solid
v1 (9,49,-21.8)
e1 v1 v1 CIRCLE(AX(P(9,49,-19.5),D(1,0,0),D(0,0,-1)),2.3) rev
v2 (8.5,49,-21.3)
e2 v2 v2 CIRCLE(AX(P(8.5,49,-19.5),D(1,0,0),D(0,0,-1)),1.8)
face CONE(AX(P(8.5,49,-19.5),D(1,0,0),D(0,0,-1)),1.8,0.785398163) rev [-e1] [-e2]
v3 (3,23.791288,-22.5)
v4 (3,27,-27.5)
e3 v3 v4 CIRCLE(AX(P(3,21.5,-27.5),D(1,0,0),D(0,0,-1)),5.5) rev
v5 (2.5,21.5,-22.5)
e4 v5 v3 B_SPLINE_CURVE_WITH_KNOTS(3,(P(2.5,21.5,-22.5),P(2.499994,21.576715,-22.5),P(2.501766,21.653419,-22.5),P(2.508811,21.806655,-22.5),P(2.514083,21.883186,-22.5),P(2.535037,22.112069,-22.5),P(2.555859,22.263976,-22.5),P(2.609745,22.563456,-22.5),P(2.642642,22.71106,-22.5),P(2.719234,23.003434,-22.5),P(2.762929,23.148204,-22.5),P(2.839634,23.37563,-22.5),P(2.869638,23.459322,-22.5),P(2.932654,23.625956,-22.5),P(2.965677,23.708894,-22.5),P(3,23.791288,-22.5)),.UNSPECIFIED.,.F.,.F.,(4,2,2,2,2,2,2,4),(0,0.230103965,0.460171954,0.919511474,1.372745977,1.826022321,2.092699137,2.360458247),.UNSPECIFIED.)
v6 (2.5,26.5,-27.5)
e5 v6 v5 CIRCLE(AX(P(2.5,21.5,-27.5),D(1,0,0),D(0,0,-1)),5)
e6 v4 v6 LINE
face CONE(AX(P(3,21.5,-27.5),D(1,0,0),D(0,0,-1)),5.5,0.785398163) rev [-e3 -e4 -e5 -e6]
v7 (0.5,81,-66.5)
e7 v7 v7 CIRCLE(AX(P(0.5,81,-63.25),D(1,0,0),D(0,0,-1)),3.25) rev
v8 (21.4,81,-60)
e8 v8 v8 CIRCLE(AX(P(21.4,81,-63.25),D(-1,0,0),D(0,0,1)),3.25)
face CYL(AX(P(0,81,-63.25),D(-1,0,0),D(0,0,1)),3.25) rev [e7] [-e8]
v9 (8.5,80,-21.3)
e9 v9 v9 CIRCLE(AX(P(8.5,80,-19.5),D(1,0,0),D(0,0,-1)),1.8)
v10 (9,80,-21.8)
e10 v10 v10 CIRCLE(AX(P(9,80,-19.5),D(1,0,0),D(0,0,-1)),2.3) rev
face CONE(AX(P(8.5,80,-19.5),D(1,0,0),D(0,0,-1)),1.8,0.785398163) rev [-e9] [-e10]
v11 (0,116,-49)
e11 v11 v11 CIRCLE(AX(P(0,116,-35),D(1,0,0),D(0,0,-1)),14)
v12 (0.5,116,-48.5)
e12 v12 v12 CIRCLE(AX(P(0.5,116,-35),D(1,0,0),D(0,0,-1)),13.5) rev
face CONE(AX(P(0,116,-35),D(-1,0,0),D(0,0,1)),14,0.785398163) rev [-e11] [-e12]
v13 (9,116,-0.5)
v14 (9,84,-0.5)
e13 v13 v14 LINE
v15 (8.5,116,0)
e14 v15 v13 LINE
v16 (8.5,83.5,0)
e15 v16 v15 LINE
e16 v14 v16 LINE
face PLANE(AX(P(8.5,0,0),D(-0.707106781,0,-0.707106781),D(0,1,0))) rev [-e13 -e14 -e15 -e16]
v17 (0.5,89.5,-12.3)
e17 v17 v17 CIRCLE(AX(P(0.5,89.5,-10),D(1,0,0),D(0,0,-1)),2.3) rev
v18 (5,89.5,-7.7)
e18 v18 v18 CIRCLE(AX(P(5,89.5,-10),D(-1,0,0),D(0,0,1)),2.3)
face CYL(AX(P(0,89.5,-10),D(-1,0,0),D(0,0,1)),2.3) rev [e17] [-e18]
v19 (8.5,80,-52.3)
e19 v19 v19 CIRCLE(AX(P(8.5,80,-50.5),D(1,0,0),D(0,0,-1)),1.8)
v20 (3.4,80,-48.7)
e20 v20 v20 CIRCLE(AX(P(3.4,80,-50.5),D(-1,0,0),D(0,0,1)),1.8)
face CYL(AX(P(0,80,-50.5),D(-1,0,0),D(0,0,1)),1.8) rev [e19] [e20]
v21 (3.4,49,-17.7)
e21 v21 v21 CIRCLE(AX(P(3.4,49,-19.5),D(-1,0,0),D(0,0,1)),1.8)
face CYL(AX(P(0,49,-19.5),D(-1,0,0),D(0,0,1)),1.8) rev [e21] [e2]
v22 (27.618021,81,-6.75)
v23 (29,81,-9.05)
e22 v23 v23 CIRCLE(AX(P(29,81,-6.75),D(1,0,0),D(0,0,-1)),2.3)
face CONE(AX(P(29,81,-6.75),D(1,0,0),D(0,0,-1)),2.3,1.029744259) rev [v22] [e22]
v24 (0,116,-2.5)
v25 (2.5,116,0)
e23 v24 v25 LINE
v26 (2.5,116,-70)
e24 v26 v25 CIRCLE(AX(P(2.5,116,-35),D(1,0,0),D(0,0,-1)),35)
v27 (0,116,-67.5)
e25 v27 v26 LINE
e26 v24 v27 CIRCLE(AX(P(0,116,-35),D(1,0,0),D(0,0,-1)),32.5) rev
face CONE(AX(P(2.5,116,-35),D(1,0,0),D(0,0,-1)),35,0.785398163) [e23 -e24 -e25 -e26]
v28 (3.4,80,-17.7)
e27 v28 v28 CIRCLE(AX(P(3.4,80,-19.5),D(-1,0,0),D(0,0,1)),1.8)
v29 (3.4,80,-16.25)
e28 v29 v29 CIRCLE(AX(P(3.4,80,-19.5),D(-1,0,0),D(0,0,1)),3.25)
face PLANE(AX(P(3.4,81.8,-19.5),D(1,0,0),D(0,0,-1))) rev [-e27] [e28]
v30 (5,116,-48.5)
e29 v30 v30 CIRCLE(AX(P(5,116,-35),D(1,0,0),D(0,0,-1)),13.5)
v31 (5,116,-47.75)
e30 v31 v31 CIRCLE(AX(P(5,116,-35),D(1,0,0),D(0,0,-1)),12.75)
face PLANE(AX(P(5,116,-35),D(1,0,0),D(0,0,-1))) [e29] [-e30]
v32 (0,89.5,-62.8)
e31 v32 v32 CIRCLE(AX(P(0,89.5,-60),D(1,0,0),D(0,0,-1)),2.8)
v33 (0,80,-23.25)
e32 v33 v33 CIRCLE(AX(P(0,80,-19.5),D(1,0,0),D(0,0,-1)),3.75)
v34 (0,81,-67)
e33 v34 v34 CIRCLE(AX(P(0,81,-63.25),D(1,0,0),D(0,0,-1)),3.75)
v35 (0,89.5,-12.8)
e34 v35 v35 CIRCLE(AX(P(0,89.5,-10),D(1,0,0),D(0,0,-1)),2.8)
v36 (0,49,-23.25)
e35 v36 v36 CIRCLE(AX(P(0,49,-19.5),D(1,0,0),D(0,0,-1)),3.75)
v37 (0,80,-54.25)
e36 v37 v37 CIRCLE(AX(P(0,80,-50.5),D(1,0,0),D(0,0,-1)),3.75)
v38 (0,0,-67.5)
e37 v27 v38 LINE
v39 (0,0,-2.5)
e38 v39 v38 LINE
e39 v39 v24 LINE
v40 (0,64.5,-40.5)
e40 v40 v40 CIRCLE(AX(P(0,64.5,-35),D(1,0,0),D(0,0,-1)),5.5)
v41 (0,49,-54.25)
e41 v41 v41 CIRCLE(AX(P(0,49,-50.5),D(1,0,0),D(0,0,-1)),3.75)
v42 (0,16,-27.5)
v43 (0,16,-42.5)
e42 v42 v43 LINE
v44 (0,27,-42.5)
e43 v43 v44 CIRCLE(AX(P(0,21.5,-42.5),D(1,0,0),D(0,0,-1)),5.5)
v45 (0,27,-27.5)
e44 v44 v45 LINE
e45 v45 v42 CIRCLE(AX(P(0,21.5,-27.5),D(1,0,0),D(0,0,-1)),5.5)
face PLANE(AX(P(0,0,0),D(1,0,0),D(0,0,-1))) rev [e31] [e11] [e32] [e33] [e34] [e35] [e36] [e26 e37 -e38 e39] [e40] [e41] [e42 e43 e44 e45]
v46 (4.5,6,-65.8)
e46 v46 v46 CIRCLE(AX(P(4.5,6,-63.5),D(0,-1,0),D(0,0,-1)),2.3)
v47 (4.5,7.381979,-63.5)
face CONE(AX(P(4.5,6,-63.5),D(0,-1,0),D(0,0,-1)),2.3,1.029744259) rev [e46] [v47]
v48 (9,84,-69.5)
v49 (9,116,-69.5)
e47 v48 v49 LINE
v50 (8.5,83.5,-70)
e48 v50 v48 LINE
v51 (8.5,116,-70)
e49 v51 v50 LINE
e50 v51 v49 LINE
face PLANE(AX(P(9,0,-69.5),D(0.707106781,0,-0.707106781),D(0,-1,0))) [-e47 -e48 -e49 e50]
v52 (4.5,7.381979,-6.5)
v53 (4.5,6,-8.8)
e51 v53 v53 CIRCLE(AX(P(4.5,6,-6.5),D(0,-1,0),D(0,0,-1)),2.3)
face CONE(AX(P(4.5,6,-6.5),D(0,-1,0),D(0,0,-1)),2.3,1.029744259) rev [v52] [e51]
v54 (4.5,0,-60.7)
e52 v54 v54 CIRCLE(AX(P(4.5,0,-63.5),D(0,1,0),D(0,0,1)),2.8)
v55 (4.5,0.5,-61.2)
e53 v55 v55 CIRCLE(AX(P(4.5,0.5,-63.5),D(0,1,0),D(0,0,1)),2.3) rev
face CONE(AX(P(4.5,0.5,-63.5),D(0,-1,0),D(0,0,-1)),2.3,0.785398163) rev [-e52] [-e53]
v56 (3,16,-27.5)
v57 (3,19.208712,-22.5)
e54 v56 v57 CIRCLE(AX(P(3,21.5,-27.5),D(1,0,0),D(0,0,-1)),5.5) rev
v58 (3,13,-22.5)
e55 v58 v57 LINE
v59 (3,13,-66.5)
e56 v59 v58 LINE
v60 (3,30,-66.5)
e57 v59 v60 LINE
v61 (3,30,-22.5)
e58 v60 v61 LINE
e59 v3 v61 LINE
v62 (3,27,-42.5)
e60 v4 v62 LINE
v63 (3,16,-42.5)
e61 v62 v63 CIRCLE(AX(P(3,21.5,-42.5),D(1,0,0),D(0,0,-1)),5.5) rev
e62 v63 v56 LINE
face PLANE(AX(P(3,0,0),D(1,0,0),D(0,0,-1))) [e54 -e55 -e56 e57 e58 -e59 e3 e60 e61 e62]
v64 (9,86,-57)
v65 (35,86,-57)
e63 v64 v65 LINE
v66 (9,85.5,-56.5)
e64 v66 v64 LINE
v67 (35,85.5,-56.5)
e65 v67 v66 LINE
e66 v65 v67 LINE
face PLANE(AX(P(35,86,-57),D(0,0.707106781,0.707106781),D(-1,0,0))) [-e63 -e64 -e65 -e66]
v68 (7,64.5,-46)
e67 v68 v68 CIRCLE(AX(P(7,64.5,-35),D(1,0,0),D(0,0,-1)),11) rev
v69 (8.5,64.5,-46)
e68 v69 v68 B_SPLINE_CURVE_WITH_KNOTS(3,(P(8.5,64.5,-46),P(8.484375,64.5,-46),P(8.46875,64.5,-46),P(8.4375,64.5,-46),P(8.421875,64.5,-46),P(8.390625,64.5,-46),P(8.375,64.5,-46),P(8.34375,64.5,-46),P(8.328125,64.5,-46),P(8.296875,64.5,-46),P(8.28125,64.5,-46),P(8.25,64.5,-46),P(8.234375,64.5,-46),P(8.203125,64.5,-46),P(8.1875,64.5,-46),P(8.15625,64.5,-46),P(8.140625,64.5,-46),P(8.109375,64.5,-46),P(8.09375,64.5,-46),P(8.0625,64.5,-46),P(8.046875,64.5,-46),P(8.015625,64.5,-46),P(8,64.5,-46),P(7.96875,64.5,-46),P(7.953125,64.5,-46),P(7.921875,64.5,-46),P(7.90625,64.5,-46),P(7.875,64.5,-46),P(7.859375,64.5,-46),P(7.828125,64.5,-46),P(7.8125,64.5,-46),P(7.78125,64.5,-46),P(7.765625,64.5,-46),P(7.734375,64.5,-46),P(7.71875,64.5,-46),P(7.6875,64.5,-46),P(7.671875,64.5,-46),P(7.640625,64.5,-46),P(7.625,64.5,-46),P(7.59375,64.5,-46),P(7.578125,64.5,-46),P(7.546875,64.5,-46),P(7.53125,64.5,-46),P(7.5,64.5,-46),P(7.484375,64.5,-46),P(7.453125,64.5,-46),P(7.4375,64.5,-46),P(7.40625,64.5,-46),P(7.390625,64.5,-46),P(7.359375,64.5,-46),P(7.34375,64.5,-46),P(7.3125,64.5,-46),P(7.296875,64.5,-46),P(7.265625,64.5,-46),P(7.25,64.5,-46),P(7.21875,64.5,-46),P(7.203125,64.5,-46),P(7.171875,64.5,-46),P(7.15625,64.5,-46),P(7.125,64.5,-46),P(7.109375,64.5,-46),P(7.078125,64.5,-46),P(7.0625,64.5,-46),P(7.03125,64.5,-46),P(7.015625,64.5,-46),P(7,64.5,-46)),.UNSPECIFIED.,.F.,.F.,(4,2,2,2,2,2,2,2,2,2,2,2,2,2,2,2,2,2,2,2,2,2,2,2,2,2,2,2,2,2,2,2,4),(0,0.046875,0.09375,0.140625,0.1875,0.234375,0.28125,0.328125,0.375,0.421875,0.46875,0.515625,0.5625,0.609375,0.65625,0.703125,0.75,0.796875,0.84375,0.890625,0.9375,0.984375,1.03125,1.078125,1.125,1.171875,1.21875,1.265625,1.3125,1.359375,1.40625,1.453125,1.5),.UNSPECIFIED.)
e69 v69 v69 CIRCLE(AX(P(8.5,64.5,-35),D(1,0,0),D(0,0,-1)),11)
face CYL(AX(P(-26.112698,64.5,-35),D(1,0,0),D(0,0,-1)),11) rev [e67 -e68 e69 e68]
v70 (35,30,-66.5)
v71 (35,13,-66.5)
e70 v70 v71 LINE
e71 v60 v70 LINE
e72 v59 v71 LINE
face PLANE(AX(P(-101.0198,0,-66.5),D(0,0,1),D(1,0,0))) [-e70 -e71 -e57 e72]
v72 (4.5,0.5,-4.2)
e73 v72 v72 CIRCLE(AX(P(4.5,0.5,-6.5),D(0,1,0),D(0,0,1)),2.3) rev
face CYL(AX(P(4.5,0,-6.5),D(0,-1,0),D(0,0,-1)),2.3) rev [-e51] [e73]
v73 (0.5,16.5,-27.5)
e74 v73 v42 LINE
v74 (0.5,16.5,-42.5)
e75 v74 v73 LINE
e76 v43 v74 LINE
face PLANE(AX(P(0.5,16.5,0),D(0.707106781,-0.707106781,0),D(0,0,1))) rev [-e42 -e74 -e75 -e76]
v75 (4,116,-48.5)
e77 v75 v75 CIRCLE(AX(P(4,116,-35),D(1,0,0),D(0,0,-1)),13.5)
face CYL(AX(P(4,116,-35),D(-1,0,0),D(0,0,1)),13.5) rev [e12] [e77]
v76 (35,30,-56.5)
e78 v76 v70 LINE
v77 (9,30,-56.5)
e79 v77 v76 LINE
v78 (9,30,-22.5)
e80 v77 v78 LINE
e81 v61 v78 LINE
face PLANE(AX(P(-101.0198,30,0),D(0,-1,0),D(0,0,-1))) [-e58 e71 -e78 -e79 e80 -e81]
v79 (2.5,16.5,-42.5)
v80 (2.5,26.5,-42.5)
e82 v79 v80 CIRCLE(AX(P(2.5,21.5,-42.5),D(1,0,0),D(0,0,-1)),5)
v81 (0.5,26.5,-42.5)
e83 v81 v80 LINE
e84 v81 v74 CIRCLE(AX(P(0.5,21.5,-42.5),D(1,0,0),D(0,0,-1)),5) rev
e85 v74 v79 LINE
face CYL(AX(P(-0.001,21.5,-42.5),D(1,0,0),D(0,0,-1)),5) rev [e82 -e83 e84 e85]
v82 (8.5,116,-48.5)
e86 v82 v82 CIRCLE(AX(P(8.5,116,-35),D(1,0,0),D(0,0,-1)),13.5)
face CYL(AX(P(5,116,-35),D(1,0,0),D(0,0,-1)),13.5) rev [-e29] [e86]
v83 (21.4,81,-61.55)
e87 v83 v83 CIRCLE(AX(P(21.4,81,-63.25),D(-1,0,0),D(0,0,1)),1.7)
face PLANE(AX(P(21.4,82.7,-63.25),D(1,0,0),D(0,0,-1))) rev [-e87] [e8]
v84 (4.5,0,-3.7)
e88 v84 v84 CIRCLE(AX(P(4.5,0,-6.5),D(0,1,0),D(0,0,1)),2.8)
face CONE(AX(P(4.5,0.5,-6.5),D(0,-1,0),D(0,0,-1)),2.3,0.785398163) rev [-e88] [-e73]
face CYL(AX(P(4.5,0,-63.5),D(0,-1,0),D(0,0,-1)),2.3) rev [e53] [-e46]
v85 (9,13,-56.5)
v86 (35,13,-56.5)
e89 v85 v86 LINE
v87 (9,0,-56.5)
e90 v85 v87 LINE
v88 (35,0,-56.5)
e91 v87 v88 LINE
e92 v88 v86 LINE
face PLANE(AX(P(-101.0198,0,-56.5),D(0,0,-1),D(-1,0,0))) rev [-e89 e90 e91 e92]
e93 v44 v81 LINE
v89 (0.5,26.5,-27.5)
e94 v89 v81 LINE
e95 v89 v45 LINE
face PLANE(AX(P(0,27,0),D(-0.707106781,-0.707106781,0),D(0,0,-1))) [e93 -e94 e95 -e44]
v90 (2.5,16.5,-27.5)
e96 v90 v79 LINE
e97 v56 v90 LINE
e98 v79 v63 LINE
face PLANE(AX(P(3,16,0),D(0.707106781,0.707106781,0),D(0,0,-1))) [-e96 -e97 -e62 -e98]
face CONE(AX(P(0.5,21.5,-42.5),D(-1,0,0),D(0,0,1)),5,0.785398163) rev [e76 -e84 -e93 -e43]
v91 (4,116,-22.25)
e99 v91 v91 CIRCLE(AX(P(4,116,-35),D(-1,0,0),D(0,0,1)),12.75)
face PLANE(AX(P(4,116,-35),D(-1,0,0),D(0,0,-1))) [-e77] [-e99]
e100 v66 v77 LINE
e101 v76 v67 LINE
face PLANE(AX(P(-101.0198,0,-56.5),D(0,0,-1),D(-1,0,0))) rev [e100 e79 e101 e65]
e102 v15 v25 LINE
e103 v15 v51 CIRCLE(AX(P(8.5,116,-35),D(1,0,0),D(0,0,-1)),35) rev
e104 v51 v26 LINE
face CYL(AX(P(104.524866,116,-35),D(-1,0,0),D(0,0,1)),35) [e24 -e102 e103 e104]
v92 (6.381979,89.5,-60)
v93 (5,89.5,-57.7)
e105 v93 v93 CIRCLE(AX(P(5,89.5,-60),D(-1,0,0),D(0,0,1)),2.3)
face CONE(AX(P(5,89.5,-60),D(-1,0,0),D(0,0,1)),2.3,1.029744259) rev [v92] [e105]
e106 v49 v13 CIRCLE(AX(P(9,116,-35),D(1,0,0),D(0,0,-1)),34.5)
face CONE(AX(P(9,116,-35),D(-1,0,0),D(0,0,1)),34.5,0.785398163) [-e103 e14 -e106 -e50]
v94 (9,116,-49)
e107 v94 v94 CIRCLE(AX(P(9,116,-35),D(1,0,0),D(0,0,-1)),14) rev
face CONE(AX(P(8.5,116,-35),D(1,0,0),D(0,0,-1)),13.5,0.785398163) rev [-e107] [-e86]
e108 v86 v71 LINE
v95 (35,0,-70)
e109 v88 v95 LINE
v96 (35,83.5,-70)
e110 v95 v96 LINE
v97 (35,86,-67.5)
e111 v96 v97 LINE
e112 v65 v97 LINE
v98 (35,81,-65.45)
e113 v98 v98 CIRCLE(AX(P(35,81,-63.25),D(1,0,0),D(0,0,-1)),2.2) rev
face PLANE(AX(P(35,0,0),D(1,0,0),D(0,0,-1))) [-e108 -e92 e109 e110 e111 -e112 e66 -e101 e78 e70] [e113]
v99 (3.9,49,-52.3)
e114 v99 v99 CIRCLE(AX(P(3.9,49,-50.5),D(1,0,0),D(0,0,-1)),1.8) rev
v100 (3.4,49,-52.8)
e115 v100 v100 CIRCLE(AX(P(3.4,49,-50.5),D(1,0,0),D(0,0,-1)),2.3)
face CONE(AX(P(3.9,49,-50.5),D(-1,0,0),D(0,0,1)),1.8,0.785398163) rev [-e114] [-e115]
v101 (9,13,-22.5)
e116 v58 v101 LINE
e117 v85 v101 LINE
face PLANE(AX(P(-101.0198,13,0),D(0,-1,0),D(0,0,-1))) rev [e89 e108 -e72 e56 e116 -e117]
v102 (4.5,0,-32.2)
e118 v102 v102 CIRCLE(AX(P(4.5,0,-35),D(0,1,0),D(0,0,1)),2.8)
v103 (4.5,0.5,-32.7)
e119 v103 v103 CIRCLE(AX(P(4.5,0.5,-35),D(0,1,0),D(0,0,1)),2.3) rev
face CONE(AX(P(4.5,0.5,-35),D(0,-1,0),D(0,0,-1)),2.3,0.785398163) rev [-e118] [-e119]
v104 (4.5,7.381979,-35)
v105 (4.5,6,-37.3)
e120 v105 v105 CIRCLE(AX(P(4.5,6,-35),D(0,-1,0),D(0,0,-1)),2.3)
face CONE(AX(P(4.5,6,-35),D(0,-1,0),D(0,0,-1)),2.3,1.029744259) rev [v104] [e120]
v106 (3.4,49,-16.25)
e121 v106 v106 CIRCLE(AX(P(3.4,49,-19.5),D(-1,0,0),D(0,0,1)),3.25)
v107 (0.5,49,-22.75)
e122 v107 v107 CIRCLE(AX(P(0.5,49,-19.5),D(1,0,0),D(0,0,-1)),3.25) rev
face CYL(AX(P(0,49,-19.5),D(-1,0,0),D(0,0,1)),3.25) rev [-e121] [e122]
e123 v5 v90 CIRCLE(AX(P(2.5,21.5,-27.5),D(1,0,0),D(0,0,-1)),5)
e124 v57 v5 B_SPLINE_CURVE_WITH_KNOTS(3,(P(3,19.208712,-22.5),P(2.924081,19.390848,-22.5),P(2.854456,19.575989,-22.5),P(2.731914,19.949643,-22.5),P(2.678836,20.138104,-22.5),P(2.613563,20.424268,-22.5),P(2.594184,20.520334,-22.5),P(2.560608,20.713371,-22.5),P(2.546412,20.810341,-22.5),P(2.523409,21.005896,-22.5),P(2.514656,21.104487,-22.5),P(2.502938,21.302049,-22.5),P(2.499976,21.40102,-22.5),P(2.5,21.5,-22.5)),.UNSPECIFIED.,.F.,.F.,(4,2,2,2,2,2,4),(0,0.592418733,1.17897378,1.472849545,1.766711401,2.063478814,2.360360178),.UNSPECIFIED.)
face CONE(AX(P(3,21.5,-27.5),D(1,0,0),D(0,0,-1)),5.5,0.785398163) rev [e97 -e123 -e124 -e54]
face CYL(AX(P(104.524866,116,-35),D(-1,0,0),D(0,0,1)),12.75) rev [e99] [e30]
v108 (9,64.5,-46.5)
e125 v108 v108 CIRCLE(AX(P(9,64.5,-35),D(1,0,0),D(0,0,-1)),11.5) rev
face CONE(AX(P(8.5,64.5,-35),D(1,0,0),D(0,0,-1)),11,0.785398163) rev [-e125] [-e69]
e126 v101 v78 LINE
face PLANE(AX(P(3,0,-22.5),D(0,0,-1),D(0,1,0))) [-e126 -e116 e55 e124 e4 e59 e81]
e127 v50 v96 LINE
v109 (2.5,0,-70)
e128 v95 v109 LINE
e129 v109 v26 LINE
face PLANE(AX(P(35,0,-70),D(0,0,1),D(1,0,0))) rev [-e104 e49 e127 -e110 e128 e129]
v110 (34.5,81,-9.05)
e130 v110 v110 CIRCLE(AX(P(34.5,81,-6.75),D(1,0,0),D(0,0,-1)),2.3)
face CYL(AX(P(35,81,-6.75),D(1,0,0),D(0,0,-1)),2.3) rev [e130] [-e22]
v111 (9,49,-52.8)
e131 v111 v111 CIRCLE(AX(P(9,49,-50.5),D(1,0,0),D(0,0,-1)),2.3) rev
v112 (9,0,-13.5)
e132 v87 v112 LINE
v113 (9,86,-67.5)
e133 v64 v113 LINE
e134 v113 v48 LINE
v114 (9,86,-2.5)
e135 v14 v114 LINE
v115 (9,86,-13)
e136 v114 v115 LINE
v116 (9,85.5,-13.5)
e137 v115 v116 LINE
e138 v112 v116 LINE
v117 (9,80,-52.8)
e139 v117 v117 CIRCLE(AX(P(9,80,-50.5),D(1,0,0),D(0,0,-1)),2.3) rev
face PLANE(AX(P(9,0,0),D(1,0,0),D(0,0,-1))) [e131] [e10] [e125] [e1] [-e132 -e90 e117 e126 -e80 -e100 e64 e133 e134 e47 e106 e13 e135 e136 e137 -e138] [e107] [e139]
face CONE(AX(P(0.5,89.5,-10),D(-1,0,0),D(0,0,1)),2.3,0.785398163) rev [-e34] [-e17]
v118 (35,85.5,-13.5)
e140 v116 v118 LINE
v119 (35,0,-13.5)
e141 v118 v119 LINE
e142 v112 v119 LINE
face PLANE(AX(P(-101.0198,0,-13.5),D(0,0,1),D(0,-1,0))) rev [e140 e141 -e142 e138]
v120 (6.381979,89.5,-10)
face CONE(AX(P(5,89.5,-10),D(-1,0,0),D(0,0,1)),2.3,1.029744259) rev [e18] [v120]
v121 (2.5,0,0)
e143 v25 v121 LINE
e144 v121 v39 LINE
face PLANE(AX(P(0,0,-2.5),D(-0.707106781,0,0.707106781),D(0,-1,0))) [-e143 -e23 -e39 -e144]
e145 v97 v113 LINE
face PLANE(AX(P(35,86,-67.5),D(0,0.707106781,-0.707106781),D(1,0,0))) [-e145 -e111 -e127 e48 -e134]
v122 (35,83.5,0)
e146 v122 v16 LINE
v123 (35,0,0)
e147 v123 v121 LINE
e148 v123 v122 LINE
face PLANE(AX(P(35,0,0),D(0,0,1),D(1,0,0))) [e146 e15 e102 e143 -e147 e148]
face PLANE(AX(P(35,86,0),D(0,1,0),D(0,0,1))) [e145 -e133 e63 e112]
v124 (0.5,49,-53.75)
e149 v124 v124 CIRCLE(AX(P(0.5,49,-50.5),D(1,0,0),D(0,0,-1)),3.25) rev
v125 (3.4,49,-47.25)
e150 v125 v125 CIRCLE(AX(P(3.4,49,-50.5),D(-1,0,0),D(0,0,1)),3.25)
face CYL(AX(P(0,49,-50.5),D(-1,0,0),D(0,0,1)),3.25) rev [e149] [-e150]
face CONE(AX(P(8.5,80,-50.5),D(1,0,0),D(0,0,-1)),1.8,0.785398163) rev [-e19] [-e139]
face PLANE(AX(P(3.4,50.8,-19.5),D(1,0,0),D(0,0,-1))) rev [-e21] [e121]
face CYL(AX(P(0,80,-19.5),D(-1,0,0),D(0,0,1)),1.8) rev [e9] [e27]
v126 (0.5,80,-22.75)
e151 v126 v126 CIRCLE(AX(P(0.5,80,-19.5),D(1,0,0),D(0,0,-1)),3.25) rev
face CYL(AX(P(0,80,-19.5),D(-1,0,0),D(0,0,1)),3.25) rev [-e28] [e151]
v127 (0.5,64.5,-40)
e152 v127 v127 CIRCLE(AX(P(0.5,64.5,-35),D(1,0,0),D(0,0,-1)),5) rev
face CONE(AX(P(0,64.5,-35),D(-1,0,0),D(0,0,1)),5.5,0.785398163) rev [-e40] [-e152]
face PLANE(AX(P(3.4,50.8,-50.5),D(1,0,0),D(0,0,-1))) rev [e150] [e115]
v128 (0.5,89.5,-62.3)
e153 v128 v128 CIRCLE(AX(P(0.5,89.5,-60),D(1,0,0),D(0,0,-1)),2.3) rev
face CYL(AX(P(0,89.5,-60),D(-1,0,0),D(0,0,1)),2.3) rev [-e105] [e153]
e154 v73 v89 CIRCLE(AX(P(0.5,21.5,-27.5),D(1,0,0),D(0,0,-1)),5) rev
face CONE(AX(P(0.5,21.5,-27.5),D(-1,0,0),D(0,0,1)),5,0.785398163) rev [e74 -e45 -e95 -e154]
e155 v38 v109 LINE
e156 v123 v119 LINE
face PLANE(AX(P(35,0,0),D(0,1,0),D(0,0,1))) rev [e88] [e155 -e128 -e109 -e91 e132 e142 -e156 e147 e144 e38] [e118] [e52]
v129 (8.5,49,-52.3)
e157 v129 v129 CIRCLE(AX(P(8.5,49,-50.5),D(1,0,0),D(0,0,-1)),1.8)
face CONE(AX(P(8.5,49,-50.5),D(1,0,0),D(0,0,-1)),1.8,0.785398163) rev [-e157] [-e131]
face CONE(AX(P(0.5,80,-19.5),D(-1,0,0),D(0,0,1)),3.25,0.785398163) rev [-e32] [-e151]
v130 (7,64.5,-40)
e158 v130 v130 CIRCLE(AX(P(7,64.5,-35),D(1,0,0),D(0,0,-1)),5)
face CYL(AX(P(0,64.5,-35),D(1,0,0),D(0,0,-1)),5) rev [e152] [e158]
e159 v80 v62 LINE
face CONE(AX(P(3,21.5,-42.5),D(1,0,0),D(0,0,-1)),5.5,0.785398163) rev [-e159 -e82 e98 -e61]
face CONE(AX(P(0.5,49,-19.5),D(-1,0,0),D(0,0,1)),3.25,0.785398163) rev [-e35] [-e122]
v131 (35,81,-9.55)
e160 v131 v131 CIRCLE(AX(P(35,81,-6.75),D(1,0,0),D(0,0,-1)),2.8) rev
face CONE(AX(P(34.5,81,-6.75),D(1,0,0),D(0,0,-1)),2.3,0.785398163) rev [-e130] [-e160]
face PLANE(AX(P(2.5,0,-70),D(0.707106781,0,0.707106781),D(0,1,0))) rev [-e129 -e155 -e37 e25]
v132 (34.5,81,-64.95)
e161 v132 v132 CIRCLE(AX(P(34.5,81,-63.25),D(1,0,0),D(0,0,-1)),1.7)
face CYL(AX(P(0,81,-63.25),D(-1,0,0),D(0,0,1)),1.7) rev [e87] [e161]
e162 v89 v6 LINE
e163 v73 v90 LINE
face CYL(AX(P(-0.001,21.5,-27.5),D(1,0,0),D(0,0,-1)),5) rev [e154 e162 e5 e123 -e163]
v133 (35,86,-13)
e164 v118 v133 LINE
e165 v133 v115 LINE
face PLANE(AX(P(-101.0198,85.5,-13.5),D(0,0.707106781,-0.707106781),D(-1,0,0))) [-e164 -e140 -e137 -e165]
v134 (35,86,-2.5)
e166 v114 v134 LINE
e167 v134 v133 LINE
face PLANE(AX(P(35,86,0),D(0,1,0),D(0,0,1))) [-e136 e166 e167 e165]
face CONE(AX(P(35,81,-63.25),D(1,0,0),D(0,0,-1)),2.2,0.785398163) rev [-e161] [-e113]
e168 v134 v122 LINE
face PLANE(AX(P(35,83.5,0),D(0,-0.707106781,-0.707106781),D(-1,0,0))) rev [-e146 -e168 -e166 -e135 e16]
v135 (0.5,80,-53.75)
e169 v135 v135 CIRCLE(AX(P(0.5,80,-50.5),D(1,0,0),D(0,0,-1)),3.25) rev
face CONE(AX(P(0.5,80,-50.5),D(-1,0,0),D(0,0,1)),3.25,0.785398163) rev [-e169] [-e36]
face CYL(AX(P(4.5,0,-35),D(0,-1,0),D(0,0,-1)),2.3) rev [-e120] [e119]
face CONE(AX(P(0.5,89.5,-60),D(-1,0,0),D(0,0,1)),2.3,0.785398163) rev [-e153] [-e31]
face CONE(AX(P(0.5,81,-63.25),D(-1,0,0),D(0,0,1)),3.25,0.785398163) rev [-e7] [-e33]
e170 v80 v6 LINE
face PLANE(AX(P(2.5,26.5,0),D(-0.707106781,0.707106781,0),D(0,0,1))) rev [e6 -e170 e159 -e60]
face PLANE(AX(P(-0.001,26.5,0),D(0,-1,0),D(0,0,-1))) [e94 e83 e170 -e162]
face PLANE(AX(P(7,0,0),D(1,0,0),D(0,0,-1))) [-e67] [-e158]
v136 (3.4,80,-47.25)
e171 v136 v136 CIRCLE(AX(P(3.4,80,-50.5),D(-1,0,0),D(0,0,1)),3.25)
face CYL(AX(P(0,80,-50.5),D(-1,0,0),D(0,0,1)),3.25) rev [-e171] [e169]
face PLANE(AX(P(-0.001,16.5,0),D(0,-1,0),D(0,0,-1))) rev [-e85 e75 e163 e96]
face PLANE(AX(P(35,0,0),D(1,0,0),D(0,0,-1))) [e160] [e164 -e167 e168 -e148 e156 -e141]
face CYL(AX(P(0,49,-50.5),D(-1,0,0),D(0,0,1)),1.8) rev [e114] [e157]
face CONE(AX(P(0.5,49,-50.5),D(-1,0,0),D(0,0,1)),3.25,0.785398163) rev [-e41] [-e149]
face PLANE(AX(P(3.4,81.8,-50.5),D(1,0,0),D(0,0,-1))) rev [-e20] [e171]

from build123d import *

# Parameters (mm, degrees)
SKETCH2_W                                           = 70
SKETCH2_H                                           = 86
BOSS_EXTRUDE1_DEPTH                                 = 35
SKETCH9_W                                           = 43
SKETCH9_H                                           = 43
SKETCH9_R                                           = 11
SKETCH9_R_2                                         = 5
SKETCH9_W_2                                         = 10
SKETCH9_H_2                                         = 17
CUT_EXTRUDE1_DEPTH                                  = 26
SKETCH2_5_R                                         = 12.75
BOSS_EXTRUDE2_DEPTH                                 = 9
SKETCH9_3_R                                         = 11
SKETCH9_3_R_2                                       = 5
CUT_EXTRUDE2_DEPTH                                  = 28
SKETCH9_4_R                                         = 5
CUT_EXTRUDE3_DEPTH                                  = 171.076453397
SKETCH20_R                                          = 13.5
CUT_EXTRUDE4_DEPTH                                  = 4
CBORE_FOR_M3_HEX_SOCKET_HEAD_CAP_SCREW1_D           = 3.6
CBORE_FOR_M3_HEX_SOCKET_HEAD_CAP_SCREW1_CBORE_D     = 6.5
CBORE_FOR_M3_HEX_SOCKET_HEAD_CAP_SCREW1_CBORE_DEPTH = 3.4
F_4_6_4_6_DIAMETER_HOLE1_D                          = 4.6
F_4_6_4_6_DIAMETER_HOLE1_DEPTH                      = 6
F_4_6_4_6_DIAMETER_HOLE1_TIP                        = 1.381979424
CBORE_FOR_M3_HEX_SOCKET_HEAD_CAP_SCREW2_D           = 3.4
CBORE_FOR_M3_HEX_SOCKET_HEAD_CAP_SCREW2_CBORE_D     = 6.5
CBORE_FOR_M3_HEX_SOCKET_HEAD_CAP_SCREW2_CBORE_DEPTH = 21.4
F_4_6_4_6_DIAMETER_HOLE2_D                          = 4.6
F_4_6_4_6_DIAMETER_HOLE2_DEPTH                      = 6
F_4_6_4_6_DIAMETER_HOLE2_TIP                        = 1.381979424
F_4_6_4_6_DIAMETER_HOLE3_D                          = 4.6
F_4_6_4_6_DIAMETER_HOLE3_DEPTH                      = 5
F_4_6_4_6_DIAMETER_HOLE3_TIP                        = 1.381979424
CUT_EXTRUDE5_DEPTH                                  = 6
CUT_EXTRUDE6_REACH                                  = 170.455
F_2_5MM_CHAMFER1_SIZE                               = 2.5
F_0_5MM_CHAMFER2_SIZE                               = 0.5


with BuildPart() as part:
    # Sketch2 → Boss-Extrude1 (new body)
    with BuildSketch(Plane(origin=(0, 0, 0), x_dir=(0, 0, -1), z_dir=(1, 0, 0))):
        with Locations((35, 43)):
            Rectangle(SKETCH2_W, SKETCH2_H)
    extrude(amount=BOSS_EXTRUDE1_DEPTH)

    # Sketch9 → Cut-Extrude1 (cut)
    # profile 1 of 5: a face of its own
    with BuildSketch(Plane(origin=(35, 0, 0), x_dir=(0, 0, -1), z_dir=(1, 0, 0))):
        with Locations((35, 64.5)):
            Rectangle(SKETCH9_W, SKETCH9_H)
        with Locations((35, 64.5)):
            Circle(SKETCH9_R, mode=Mode.SUBTRACT)
    # profile 2 of 5: a face of its own
    with BuildSketch(Plane(origin=(35, 0, 0), x_dir=(0, 0, -1), z_dir=(1, 0, 0))):
        with Locations((35, 64.5)):
            Circle(SKETCH9_R)
        with Locations((35, 64.5)):
            Circle(SKETCH9_R_2, mode=Mode.SUBTRACT)
    # profile 3 of 5: a face of its own
    with BuildSketch(Plane(origin=(35, 0, 0), x_dir=(0, 0, -1), z_dir=(1, 0, 0))):
        with Locations((35, 64.5)):
            Circle(SKETCH9_R_2)
    # profile 4 of 5: a face of its own
    with BuildSketch(Plane(origin=(35, 0, 0), x_dir=(0, 0, -1), z_dir=(1, 0, 0))):
        Polygon((56.5, 43), (13.5, 43), (13.5, 0), (56.5, 0), (56.5, 13), (56.5, 30), align=None)
    # profile 5 of 5: a face of its own
    with BuildSketch(Plane(origin=(35, 0, 0), x_dir=(0, 0, -1), z_dir=(1, 0, 0))):
        with Locations((61.5, 21.5)):
            Rectangle(SKETCH9_W_2, SKETCH9_H_2)
    extrude(amount=-CUT_EXTRUDE1_DEPTH, mode=Mode.SUBTRACT)

    # Sketch2<5> → Boss-Extrude2 (add)
    with BuildSketch(Plane(origin=(0, 0, 0), x_dir=(0, 0, -1), z_dir=(1, 0, 0))):
        with BuildLine():
            Line((0, 116), (0, 86))
            Line((0, 86), (70, 86))
            Line((70, 86), (70, 116))
            ThreePointArc((70, 116), (35, 151), (0, 116))
        make_face()
        with Locations((35, 116)):
            Circle(SKETCH2_5_R, mode=Mode.SUBTRACT)
    extrude(amount=BOSS_EXTRUDE2_DEPTH)

    # Sketch9<3> → Cut-Extrude2 (cut)
    # profile 1 of 2: a face of its own
    with BuildSketch(Plane(origin=(35, 0, 0), x_dir=(0, 0, -1), z_dir=(1, 0, 0))):
        with Locations((35, 64.5)):
            Circle(SKETCH9_3_R)
        with Locations((35, 64.5)):
            Circle(SKETCH9_3_R_2, mode=Mode.SUBTRACT)
    # profile 2 of 2: a face of its own
    with BuildSketch(Plane(origin=(35, 0, 0), x_dir=(0, 0, -1), z_dir=(1, 0, 0))):
        with Locations((35, 64.5)):
            Circle(SKETCH9_3_R_2)
    extrude(amount=-CUT_EXTRUDE2_DEPTH, mode=Mode.SUBTRACT)

    # Sketch9<4> → Cut-Extrude3 (cut, through all)
    with BuildSketch(Plane(origin=(35, 0, 0), x_dir=(0, 0, -1), z_dir=(1, 0, 0))):
        with Locations((35, 64.5)):
            Circle(SKETCH9_4_R)
    extrude(amount=-CUT_EXTRUDE3_DEPTH, mode=Mode.SUBTRACT)

    # Sketch20 → Cut-Extrude4 (cut)
    with BuildSketch(Plane(origin=(9, 0, 0), x_dir=(0, 0, -1), z_dir=(1, 0, 0))):
        with Locations((35, 116)):
            Circle(SKETCH20_R)
    cut_extrude4 = extrude(amount=-CUT_EXTRUDE4_DEPTH, mode=Mode.SUBTRACT)

    # Mirror1: Cut-Extrude4 across plane
    add(cut_extrude4.mirror(Plane(origin=(4.5, 0, 0), x_dir=(0, 0, 1), z_dir=(1, 0, 0))), mode=Mode.SUBTRACT)

    # CBORE for M3 Hex Socket Head Cap Screw1 (through all)
    with Locations(Plane.ZY):
        with Locations((-19.5, 49), (-35, 64.5), (-19.5, 80), (-50.5, 49), (-50.5, 80)):
            CounterBoreHole(CBORE_FOR_M3_HEX_SOCKET_HEAD_CAP_SCREW1_D / 2, CBORE_FOR_M3_HEX_SOCKET_HEAD_CAP_SCREW1_CBORE_D / 2, CBORE_FOR_M3_HEX_SOCKET_HEAD_CAP_SCREW1_CBORE_DEPTH)

    # Ø4.6 (4.6) Diameter Hole1
    with Locations(Plane(origin=(0, 0, 0), x_dir=(-1, 0, 0), z_dir=(0, -1, 0))):
        with Locations((-4.5, 35), (-35, 35), (-4.5, 63.5), (-4.5, 6.5)):
            Hole(F_4_6_4_6_DIAMETER_HOLE1_D / 2, depth=F_4_6_4_6_DIAMETER_HOLE1_DEPTH)
            with Locations((0, 0, -(F_4_6_4_6_DIAMETER_HOLE1_DEPTH + F_4_6_4_6_DIAMETER_HOLE1_TIP / 2))):  # 118° drill point
                Cone(0, F_4_6_4_6_DIAMETER_HOLE1_D / 2, F_4_6_4_6_DIAMETER_HOLE1_TIP, mode=Mode.SUBTRACT)

    # CBORE for M3 Hex Socket Head Cap Screw2 (through all)
    with Locations(Plane.ZY):
        with Locations((-63.25, 81)):
            CounterBoreHole(CBORE_FOR_M3_HEX_SOCKET_HEAD_CAP_SCREW2_D / 2, CBORE_FOR_M3_HEX_SOCKET_HEAD_CAP_SCREW2_CBORE_D / 2, CBORE_FOR_M3_HEX_SOCKET_HEAD_CAP_SCREW2_CBORE_DEPTH)

    # Ø4.6 (4.6) Diameter Hole2
    with Locations(Plane(origin=(35, 0, 0), x_dir=(0, 0, -1), z_dir=(1, 0, 0))):
        with Locations((6.75, 81)):
            Hole(F_4_6_4_6_DIAMETER_HOLE2_D / 2, depth=F_4_6_4_6_DIAMETER_HOLE2_DEPTH)
            with Locations((0, 0, -(F_4_6_4_6_DIAMETER_HOLE2_DEPTH + F_4_6_4_6_DIAMETER_HOLE2_TIP / 2))):  # 118° drill point
                Cone(0, F_4_6_4_6_DIAMETER_HOLE2_D / 2, F_4_6_4_6_DIAMETER_HOLE2_TIP, mode=Mode.SUBTRACT)

    # Ø4.6 (4.6) Diameter Hole3
    with Locations(Plane.ZY):
        with Locations((-60, 89.5), (-10, 89.5)):
            Hole(F_4_6_4_6_DIAMETER_HOLE3_D / 2, depth=F_4_6_4_6_DIAMETER_HOLE3_DEPTH)
            with Locations((0, 0, -(F_4_6_4_6_DIAMETER_HOLE3_DEPTH + F_4_6_4_6_DIAMETER_HOLE3_TIP / 2))):  # 118° drill point
                Cone(0, F_4_6_4_6_DIAMETER_HOLE3_D / 2, F_4_6_4_6_DIAMETER_HOLE3_TIP, mode=Mode.SUBTRACT)

    # Sketch23 → Cut-Extrude5 (cut)
    # profile 1 of 2: a face of its own
    with BuildSketch(Plane(origin=(9, 0, 0), x_dir=(0, 0, -1), z_dir=(1, 0, 0))):
        Polygon((56.5, 13), (66.5, 13), (66.5, 30), (56.5, 30), (22.5, 30), (22.5, 21.49999992), (22.5, 13), align=None)
        with BuildLine():
            ThreePointArc((27.5, 16.5), (23.964466122, 17.964466066), (22.5, 21.49999992))
            ThreePointArc((22.5, 21.49999992), (23.964466066, 25.035533878), (27.5, 26.5))
            Line((27.5, 26.5), (42.5, 26.5))
            ThreePointArc((42.5, 26.5), (47.5, 21.5), (42.5, 16.5))
            Line((42.5, 16.5), (27.5, 16.5))
        make_face(mode=Mode.SUBTRACT)
    # profile 2 of 2: a face of its own
    with BuildSketch(Plane(origin=(9, 0, 0), x_dir=(0, 0, -1), z_dir=(1, 0, 0))):
        with BuildLine():
            Line((27.5, 16.5), (42.5, 16.5))
            ThreePointArc((42.5, 16.5), (47.5, 21.5), (42.5, 26.5))
            Line((42.5, 26.5), (27.5, 26.5))
            ThreePointArc((27.5, 26.5), (22.5, 21.5), (27.5, 16.5))
        make_face()
    extrude(amount=-CUT_EXTRUDE5_DEPTH, mode=Mode.SUBTRACT)

    # Sketch23<3> → Cut-Extrude6 (cut, up to next)
    with BuildSketch(Plane(origin=(9, 0, 0), x_dir=(0, 0, -1), z_dir=(1, 0, 0)), mode=Mode.PRIVATE) as cut_extrude6_sk1:
        with BuildLine():
            Line((27.5, 16.5), (42.5, 16.5))
            ThreePointArc((42.5, 16.5), (47.5, 21.5), (42.5, 26.5))
            Line((42.5, 26.5), (27.5, 26.5))
            ThreePointArc((27.5, 26.5), (22.5, 21.5), (27.5, 16.5))
        make_face()
    cut_extrude6_tool1 = extrude(cut_extrude6_sk1.sketch, amount=-CUT_EXTRUDE6_REACH, mode=Mode.PRIVATE) & part.part
    add(cut_extrude6_tool1.solids().sort_by_distance((9, 21.5, -35))[0], mode=Mode.SUBTRACT)

    # 2,5mm Chamfer1
    f_2_5mm_chamfer1_edges = [part.edges().sort_by_distance(p)[0] for p in [
        (0, 151, -35),
        (0, 58, 0),
        (0, 58, -70),
        (22, 86, 0),
        (22, 86, -70),
    ]]
    chamfer(f_2_5mm_chamfer1_edges, length=F_2_5MM_CHAMFER1_SIZE)

    # 0,5mm Chamfer2
    # the kernel refuses this chamfer: 0.5 mm, written as the material it takes off along each edge
    with BuildSketch(Plane(origin=(9, 80, -50.5), x_dir=(0, 0, -1), z_dir=(0, -1, 0))) as f_0_5mm_chamfer2_piece_1:
        Polygon((1.8 + F_0_5MM_CHAMFER2_SIZE, 0), (1.8, -F_0_5MM_CHAMFER2_SIZE), (1.8, 0), align=None)
    revolve(axis=Axis((9, 80, -50.5), (1, 0, 0)), mode=Mode.SUBTRACT)
    with BuildSketch(Plane(origin=(0, 80, -50.5), x_dir=(0, 0, 1), z_dir=(0, -1, 0))) as f_0_5mm_chamfer2_piece_2:
        Polygon((3.25, -F_0_5MM_CHAMFER2_SIZE), (3.25 + F_0_5MM_CHAMFER2_SIZE, 0), (3.25, 0), align=None)
    revolve(axis=Axis((0, 80, -50.5), (-1, 0, 0)), mode=Mode.SUBTRACT)
    with BuildSketch(Plane(origin=(9, 49, -50.5), x_dir=(0, 0, -1), z_dir=(0, -1, 0))) as f_0_5mm_chamfer2_piece_3:
        Polygon((1.8 + F_0_5MM_CHAMFER2_SIZE, 0), (1.8, -F_0_5MM_CHAMFER2_SIZE), (1.8, 0), align=None)
    revolve(axis=Axis((9, 49, -50.5), (1, 0, 0)), mode=Mode.SUBTRACT)
    with BuildSketch(Plane(origin=(0, 49, -50.5), x_dir=(0, 0, 1), z_dir=(0, -1, 0))) as f_0_5mm_chamfer2_piece_4:
        Polygon((3.25, -F_0_5MM_CHAMFER2_SIZE), (3.25 + F_0_5MM_CHAMFER2_SIZE, 0), (3.25, 0), align=None)
    revolve(axis=Axis((0, 49, -50.5), (-1, 0, 0)), mode=Mode.SUBTRACT)
    with BuildSketch(Plane(origin=(3.4, 49, -50.5), x_dir=(0, 0, -1), z_dir=(0, -1, 0))) as f_0_5mm_chamfer2_piece_5:
        Polygon((1.8, F_0_5MM_CHAMFER2_SIZE), (1.8 + F_0_5MM_CHAMFER2_SIZE, 0), (1.8, 0), align=None)
    revolve(axis=Axis((3.4, 49, -50.5), (1, 0, 0)), mode=Mode.SUBTRACT)
    with BuildSketch(Plane(origin=(9, 80, -19.5), x_dir=(0, 0, -1), z_dir=(0, -1, 0))) as f_0_5mm_chamfer2_piece_6:
        Polygon((1.8 + F_0_5MM_CHAMFER2_SIZE, 0), (1.8, -F_0_5MM_CHAMFER2_SIZE), (1.8, 0), align=None)
    revolve(axis=Axis((9, 80, -19.5), (1, 0, 0)), mode=Mode.SUBTRACT)
    with BuildSketch(Plane(origin=(0, 80, -19.5), x_dir=(0, 0, 1), z_dir=(0, -1, 0))) as f_0_5mm_chamfer2_piece_7:
        Polygon((3.25, -F_0_5MM_CHAMFER2_SIZE), (3.25 + F_0_5MM_CHAMFER2_SIZE, 0), (3.25, 0), align=None)
    revolve(axis=Axis((0, 80, -19.5), (-1, 0, 0)), mode=Mode.SUBTRACT)
    with BuildSketch(Plane(origin=(4.5, 0, -35), x_dir=(1, 0, 0), z_dir=(0, 0, 1))) as f_0_5mm_chamfer2_piece_8:
        Polygon((2.3 + F_0_5MM_CHAMFER2_SIZE, 0), (2.3, F_0_5MM_CHAMFER2_SIZE), (2.3, 0), align=None)
    revolve(axis=Axis((4.5, 0, -35), (0, 1, 0)), mode=Mode.SUBTRACT)
    with BuildSketch(Plane(origin=(4.5, 0, -6.5), x_dir=(1, 0, 0), z_dir=(0, 0, 1))) as f_0_5mm_chamfer2_piece_9:
        Polygon((2.3 + F_0_5MM_CHAMFER2_SIZE, 0), (2.3, F_0_5MM_CHAMFER2_SIZE), (2.3, 0), align=None)
    revolve(axis=Axis((4.5, 0, -6.5), (0, 1, 0)), mode=Mode.SUBTRACT)
    with BuildSketch(Plane(origin=(4.5, 0, -63.5), x_dir=(1, 0, 0), z_dir=(0, 0, 1))) as f_0_5mm_chamfer2_piece_10:
        Polygon((2.3 + F_0_5MM_CHAMFER2_SIZE, 0), (2.3, F_0_5MM_CHAMFER2_SIZE), (2.3, 0), align=None)
    revolve(axis=Axis((4.5, 0, -63.5), (0, 1, 0)), mode=Mode.SUBTRACT)
    with BuildSketch(Plane(origin=(0, 81, -63.25), x_dir=(0, 0, 1), z_dir=(0, -1, 0))) as f_0_5mm_chamfer2_piece_11:
        Polygon((3.25, -F_0_5MM_CHAMFER2_SIZE), (3.25 + F_0_5MM_CHAMFER2_SIZE, 0), (3.25, 0), align=None)
    revolve(axis=Axis((0, 81, -63.25), (-1, 0, 0)), mode=Mode.SUBTRACT)
    with BuildSketch(Plane(origin=(35, 81, -63.25), x_dir=(0, 0, -1), z_dir=(0, -1, 0))) as f_0_5mm_chamfer2_piece_12:
        Polygon((1.7 + F_0_5MM_CHAMFER2_SIZE, 0), (1.7, -F_0_5MM_CHAMFER2_SIZE), (1.7, 0), align=None)
    revolve(axis=Axis((35, 81, -63.25), (1, 0, 0)), mode=Mode.SUBTRACT)
    with BuildSketch(Plane(origin=(35, 81, -6.75), x_dir=(0, 0, 1), z_dir=(0, -1, 0))) as f_0_5mm_chamfer2_piece_13:
        Polygon((2.3 + F_0_5MM_CHAMFER2_SIZE, 0), (2.3, F_0_5MM_CHAMFER2_SIZE), (2.3, 0), align=None)
    revolve(axis=Axis((35, 81, -6.75), (-1, 0, 0)), mode=Mode.SUBTRACT)
    with BuildSketch(Plane(origin=(0, 89.5, -60), x_dir=(0, 0, -1), z_dir=(0, -1, 0))) as f_0_5mm_chamfer2_piece_14:
        Polygon((2.3 + F_0_5MM_CHAMFER2_SIZE, 0), (2.3, F_0_5MM_CHAMFER2_SIZE), (2.3, 0), align=None)
    revolve(axis=Axis((0, 89.5, -60), (1, 0, 0)), mode=Mode.SUBTRACT)
    with BuildSketch(Plane(origin=(0, 89.5, -10), x_dir=(0, 0, -1), z_dir=(0, -1, 0))) as f_0_5mm_chamfer2_piece_15:
        Polygon((2.3 + F_0_5MM_CHAMFER2_SIZE, 0), (2.3, F_0_5MM_CHAMFER2_SIZE), (2.3, 0), align=None)
    revolve(axis=Axis((0, 89.5, -10), (1, 0, 0)), mode=Mode.SUBTRACT)
    with BuildSketch(Plane(origin=(3, 16.5, -42.5), x_dir=(0.02749587661058651, -0.9996219169112968, 0), z_dir=(0, 0, 1)), Plane(origin=(0, 26.5, -27.5), x_dir=(0.9996219169112968, -0.02749587661058908, 0), z_dir=(0, 0, -1)), Plane(origin=(3, 26.5, -27.5), x_dir=(0.027495876610586414, 0.9996219169112968, 0), z_dir=(0, 0, -1)), Plane(origin=(0, 16.5, -42.5), x_dir=(0.9996219169112968, 0.02749587661058908, 0), z_dir=(0, 0, 1))) as f_0_5mm_chamfer2_piece_16:
        Polygon((F_0_5MM_CHAMFER2_SIZE * 0.999621916911, -F_0_5MM_CHAMFER2_SIZE * 0.0274958766106), (-F_0_5MM_CHAMFER2_SIZE * 0.0274958766106, -F_0_5MM_CHAMFER2_SIZE * 0.999621916911), (0, 0), align=None)
    extrude(amount=15, mode=Mode.SUBTRACT)
    with BuildSketch(Plane(origin=(3, 21.5, -27.5), x_dir=(0, -1, 0), z_dir=(0, 0, -1))) as f_0_5mm_chamfer2_piece_17_section:
        Polygon((5 + F_0_5MM_CHAMFER2_SIZE, 0), (5, F_0_5MM_CHAMFER2_SIZE), (5, 0), align=None)
    f_0_5mm_chamfer2_piece_17 = revolve(axis=Axis((3, 21.5, -27.5), (-1, 0, 0)), revolution_arc=90, mode=Mode.PRIVATE)
    f_0_5mm_chamfer2_piece_17 = split(f_0_5mm_chamfer2_piece_17, bisect_by=Plane(origin=(2.857900217, 16.356388303, -22.5), z_dir=(0, 0, -1)), keep=Keep.TOP, mode=Mode.PRIVATE)
    add(f_0_5mm_chamfer2_piece_17, mode=Mode.SUBTRACT)
    with BuildSketch(Plane(origin=(3, 21.5, -27.5), x_dir=(0, 0, 1), z_dir=(0, -1, 0))) as f_0_5mm_chamfer2_piece_18_section:
        Polygon((5 + F_0_5MM_CHAMFER2_SIZE, 0), (5, F_0_5MM_CHAMFER2_SIZE), (5, 0), align=None)
    f_0_5mm_chamfer2_piece_18 = revolve(axis=Axis((3, 21.5, -27.5), (-1, 0, 0)), revolution_arc=90, mode=Mode.PRIVATE)
    f_0_5mm_chamfer2_piece_18 = split(f_0_5mm_chamfer2_piece_18, bisect_by=Plane(origin=(2.756305159, 25.207852181, -22.5), z_dir=(0, 0, -1)), keep=Keep.TOP, mode=Mode.PRIVATE)
    add(f_0_5mm_chamfer2_piece_18, mode=Mode.SUBTRACT)
    with BuildSketch(Plane(origin=(3, 21.5, -42.5), x_dir=(0, -1, 0), z_dir=(0, 0, 1))) as f_0_5mm_chamfer2_piece_19:
        Polygon((5 + F_0_5MM_CHAMFER2_SIZE, 0), (5, -F_0_5MM_CHAMFER2_SIZE), (5, 0), align=None)
    revolve(axis=Axis((3, 21.5, -42.5), (1, 0, 0)), revolution_arc=180, mode=Mode.SUBTRACT)
    with BuildSketch(Plane(origin=(0, 21.5, -42.5), x_dir=(0, -1, 0), z_dir=(0, 0, 1))) as f_0_5mm_chamfer2_piece_20:
        Polygon((5, F_0_5MM_CHAMFER2_SIZE), (5 + F_0_5MM_CHAMFER2_SIZE, 0), (5, 0), align=None)
    revolve(axis=Axis((0, 21.5, -42.5), (1, 0, 0)), revolution_arc=180, mode=Mode.SUBTRACT)
    with BuildSketch(Plane(origin=(0, 21.5, -27.5), x_dir=(0, 1, 0), z_dir=(0, 0, -1))) as f_0_5mm_chamfer2_piece_21:
        Polygon((5, F_0_5MM_CHAMFER2_SIZE), (5 + F_0_5MM_CHAMFER2_SIZE, 0), (5, 0), align=None)
    revolve(axis=Axis((0, 21.5, -27.5), (1, 0, 0)), revolution_arc=180, mode=Mode.SUBTRACT)
    with BuildSketch(Plane(origin=(36.285841494, 86, -13.5), x_dir=(0, 0.0274958766105822, 0.999621916911297), z_dir=(-1, 0, 0))) as f_0_5mm_chamfer2_piece_22:
        Polygon((F_0_5MM_CHAMFER2_SIZE * 0.999621916911, -F_0_5MM_CHAMFER2_SIZE * 0.0274958766106), (-F_0_5MM_CHAMFER2_SIZE * 0.0274958766106, -F_0_5MM_CHAMFER2_SIZE * 0.999621916911), (0, 0), align=None)
    extrude(amount=27.285841494, mode=Mode.SUBTRACT)
    with BuildSketch(Plane(origin=(36.285841494, 86, -56.5), x_dir=(0, 0.02749587661058229, -0.9996219169112968), z_dir=(-1, 0, 0))) as f_0_5mm_chamfer2_piece_23:
        Polygon((F_0_5MM_CHAMFER2_SIZE * 0.999621916911, F_0_5MM_CHAMFER2_SIZE * 0.0274958766106), (-F_0_5MM_CHAMFER2_SIZE * 0.0274958766106, F_0_5MM_CHAMFER2_SIZE * 0.999621916911), (0, 0), align=None)
    extrude(amount=27.285841494, mode=Mode.SUBTRACT)
    with BuildSketch(Plane(origin=(9, 82.214158506, 0), x_dir=(0.02749587661058563, 0, -0.9996219169112968), z_dir=(0, 1, 0))) as f_0_5mm_chamfer2_piece_24_section:
        Polygon((F_0_5MM_CHAMFER2_SIZE * 0.999621916911, F_0_5MM_CHAMFER2_SIZE * 0.0274958766106), (-F_0_5MM_CHAMFER2_SIZE * 0.0274958766106, F_0_5MM_CHAMFER2_SIZE * 0.999621916911), (0, 0), align=None)
    f_0_5mm_chamfer2_piece_24 = extrude(amount=33.785841494, mode=Mode.PRIVATE)
    f_0_5mm_chamfer2_piece_24 = split(f_0_5mm_chamfer2_piece_24, bisect_by=Plane(origin=(8.830530304, 90.974038618, -7.474038618), z_dir=(0, 0.7071067811865476, 0.7071067811865476)), keep=Keep.TOP, mode=Mode.PRIVATE)
    add(f_0_5mm_chamfer2_piece_24, mode=Mode.SUBTRACT)
    with BuildSketch(Plane(origin=(9, 116, -70), x_dir=(0.02749587661058574, 0, 0.9996219169112968), z_dir=(0, -1, 0))) as f_0_5mm_chamfer2_piece_25_section:
        Polygon((F_0_5MM_CHAMFER2_SIZE * 0.999621916911, F_0_5MM_CHAMFER2_SIZE * 0.0274958766106), (-F_0_5MM_CHAMFER2_SIZE * 0.0274958766106, F_0_5MM_CHAMFER2_SIZE * 0.999621916911), (0, 0), align=None)
    f_0_5mm_chamfer2_piece_25 = extrude(amount=33.785841494, mode=Mode.PRIVATE)
    f_0_5mm_chamfer2_piece_25 = split(f_0_5mm_chamfer2_piece_25, bisect_by=Plane(origin=(8.857094112, 98.934594611, -54.565405389), z_dir=(0, 0.7071067811865476, -0.7071067811865476)), keep=Keep.TOP, mode=Mode.PRIVATE)
    add(f_0_5mm_chamfer2_piece_25, mode=Mode.SUBTRACT)
    with BuildSketch(Plane(origin=(9, 116, -35), x_dir=(0, 0, -1), z_dir=(0, -1, 0))) as f_0_5mm_chamfer2_piece_26:
        Polygon((35 - F_0_5MM_CHAMFER2_SIZE, 0), (35, -F_0_5MM_CHAMFER2_SIZE), (35, 0), align=None)
    revolve(axis=Axis((9, 116, -35), (1, 0, 0)), revolution_arc=180, mode=Mode.SUBTRACT)
    with BuildSketch(Plane(origin=(9, 64.5, -35), x_dir=(0, 0, -1), z_dir=(0, -1, 0))) as f_0_5mm_chamfer2_piece_27:
        Polygon((11 + F_0_5MM_CHAMFER2_SIZE, 0), (11, -F_0_5MM_CHAMFER2_SIZE), (11, 0), align=None)
    revolve(axis=Axis((9, 64.5, -35), (1, 0, 0)), mode=Mode.SUBTRACT)
    with BuildSketch(Plane(origin=(0, 64.5, -35), x_dir=(0, 0, -1), z_dir=(0, -1, 0))) as f_0_5mm_chamfer2_piece_28:
        Polygon((5, F_0_5MM_CHAMFER2_SIZE), (5 + F_0_5MM_CHAMFER2_SIZE, 0), (5, 0), align=None)
    revolve(axis=Axis((0, 64.5, -35), (1, 0, 0)), mode=Mode.SUBTRACT)
    with BuildSketch(Plane(origin=(9, 116, -35), x_dir=(0, 0, -1), z_dir=(0, -1, 0))) as f_0_5mm_chamfer2_piece_29:
        Polygon((13.5 + F_0_5MM_CHAMFER2_SIZE, 0), (13.5, -F_0_5MM_CHAMFER2_SIZE), (13.5, 0), align=None)
    revolve(axis=Axis((9, 116, -35), (1, 0, 0)), mode=Mode.SUBTRACT)
    with BuildSketch(Plane(origin=(0, 116, -35), x_dir=(0, 0, -1), z_dir=(0, -1, 0))) as f_0_5mm_chamfer2_piece_30:
        Polygon((13.5, F_0_5MM_CHAMFER2_SIZE), (13.5 + F_0_5MM_CHAMFER2_SIZE, 0), (13.5, 0), align=None)
    revolve(axis=Axis((0, 116, -35), (1, 0, 0)), mode=Mode.SUBTRACT)
    with BuildSketch(Plane(origin=(9, 49, -19.5), x_dir=(0, 0, -1), z_dir=(0, -1, 0))) as f_0_5mm_chamfer2_piece_31:
        Polygon((1.8 + F_0_5MM_CHAMFER2_SIZE, 0), (1.8, -F_0_5MM_CHAMFER2_SIZE), (1.8, 0), align=None)
    revolve(axis=Axis((9, 49, -19.5), (1, 0, 0)), mode=Mode.SUBTRACT)
    with BuildSketch(Plane(origin=(0, 49, -19.5), x_dir=(0, 0, 1), z_dir=(0, -1, 0))) as f_0_5mm_chamfer2_piece_32:
        Polygon((3.25, -F_0_5MM_CHAMFER2_SIZE), (3.25 + F_0_5MM_CHAMFER2_SIZE, 0), (3.25, 0), align=None)
    revolve(axis=Axis((0, 49, -19.5), (-1, 0, 0)), mode=Mode.SUBTRACT)


solid = part.part
